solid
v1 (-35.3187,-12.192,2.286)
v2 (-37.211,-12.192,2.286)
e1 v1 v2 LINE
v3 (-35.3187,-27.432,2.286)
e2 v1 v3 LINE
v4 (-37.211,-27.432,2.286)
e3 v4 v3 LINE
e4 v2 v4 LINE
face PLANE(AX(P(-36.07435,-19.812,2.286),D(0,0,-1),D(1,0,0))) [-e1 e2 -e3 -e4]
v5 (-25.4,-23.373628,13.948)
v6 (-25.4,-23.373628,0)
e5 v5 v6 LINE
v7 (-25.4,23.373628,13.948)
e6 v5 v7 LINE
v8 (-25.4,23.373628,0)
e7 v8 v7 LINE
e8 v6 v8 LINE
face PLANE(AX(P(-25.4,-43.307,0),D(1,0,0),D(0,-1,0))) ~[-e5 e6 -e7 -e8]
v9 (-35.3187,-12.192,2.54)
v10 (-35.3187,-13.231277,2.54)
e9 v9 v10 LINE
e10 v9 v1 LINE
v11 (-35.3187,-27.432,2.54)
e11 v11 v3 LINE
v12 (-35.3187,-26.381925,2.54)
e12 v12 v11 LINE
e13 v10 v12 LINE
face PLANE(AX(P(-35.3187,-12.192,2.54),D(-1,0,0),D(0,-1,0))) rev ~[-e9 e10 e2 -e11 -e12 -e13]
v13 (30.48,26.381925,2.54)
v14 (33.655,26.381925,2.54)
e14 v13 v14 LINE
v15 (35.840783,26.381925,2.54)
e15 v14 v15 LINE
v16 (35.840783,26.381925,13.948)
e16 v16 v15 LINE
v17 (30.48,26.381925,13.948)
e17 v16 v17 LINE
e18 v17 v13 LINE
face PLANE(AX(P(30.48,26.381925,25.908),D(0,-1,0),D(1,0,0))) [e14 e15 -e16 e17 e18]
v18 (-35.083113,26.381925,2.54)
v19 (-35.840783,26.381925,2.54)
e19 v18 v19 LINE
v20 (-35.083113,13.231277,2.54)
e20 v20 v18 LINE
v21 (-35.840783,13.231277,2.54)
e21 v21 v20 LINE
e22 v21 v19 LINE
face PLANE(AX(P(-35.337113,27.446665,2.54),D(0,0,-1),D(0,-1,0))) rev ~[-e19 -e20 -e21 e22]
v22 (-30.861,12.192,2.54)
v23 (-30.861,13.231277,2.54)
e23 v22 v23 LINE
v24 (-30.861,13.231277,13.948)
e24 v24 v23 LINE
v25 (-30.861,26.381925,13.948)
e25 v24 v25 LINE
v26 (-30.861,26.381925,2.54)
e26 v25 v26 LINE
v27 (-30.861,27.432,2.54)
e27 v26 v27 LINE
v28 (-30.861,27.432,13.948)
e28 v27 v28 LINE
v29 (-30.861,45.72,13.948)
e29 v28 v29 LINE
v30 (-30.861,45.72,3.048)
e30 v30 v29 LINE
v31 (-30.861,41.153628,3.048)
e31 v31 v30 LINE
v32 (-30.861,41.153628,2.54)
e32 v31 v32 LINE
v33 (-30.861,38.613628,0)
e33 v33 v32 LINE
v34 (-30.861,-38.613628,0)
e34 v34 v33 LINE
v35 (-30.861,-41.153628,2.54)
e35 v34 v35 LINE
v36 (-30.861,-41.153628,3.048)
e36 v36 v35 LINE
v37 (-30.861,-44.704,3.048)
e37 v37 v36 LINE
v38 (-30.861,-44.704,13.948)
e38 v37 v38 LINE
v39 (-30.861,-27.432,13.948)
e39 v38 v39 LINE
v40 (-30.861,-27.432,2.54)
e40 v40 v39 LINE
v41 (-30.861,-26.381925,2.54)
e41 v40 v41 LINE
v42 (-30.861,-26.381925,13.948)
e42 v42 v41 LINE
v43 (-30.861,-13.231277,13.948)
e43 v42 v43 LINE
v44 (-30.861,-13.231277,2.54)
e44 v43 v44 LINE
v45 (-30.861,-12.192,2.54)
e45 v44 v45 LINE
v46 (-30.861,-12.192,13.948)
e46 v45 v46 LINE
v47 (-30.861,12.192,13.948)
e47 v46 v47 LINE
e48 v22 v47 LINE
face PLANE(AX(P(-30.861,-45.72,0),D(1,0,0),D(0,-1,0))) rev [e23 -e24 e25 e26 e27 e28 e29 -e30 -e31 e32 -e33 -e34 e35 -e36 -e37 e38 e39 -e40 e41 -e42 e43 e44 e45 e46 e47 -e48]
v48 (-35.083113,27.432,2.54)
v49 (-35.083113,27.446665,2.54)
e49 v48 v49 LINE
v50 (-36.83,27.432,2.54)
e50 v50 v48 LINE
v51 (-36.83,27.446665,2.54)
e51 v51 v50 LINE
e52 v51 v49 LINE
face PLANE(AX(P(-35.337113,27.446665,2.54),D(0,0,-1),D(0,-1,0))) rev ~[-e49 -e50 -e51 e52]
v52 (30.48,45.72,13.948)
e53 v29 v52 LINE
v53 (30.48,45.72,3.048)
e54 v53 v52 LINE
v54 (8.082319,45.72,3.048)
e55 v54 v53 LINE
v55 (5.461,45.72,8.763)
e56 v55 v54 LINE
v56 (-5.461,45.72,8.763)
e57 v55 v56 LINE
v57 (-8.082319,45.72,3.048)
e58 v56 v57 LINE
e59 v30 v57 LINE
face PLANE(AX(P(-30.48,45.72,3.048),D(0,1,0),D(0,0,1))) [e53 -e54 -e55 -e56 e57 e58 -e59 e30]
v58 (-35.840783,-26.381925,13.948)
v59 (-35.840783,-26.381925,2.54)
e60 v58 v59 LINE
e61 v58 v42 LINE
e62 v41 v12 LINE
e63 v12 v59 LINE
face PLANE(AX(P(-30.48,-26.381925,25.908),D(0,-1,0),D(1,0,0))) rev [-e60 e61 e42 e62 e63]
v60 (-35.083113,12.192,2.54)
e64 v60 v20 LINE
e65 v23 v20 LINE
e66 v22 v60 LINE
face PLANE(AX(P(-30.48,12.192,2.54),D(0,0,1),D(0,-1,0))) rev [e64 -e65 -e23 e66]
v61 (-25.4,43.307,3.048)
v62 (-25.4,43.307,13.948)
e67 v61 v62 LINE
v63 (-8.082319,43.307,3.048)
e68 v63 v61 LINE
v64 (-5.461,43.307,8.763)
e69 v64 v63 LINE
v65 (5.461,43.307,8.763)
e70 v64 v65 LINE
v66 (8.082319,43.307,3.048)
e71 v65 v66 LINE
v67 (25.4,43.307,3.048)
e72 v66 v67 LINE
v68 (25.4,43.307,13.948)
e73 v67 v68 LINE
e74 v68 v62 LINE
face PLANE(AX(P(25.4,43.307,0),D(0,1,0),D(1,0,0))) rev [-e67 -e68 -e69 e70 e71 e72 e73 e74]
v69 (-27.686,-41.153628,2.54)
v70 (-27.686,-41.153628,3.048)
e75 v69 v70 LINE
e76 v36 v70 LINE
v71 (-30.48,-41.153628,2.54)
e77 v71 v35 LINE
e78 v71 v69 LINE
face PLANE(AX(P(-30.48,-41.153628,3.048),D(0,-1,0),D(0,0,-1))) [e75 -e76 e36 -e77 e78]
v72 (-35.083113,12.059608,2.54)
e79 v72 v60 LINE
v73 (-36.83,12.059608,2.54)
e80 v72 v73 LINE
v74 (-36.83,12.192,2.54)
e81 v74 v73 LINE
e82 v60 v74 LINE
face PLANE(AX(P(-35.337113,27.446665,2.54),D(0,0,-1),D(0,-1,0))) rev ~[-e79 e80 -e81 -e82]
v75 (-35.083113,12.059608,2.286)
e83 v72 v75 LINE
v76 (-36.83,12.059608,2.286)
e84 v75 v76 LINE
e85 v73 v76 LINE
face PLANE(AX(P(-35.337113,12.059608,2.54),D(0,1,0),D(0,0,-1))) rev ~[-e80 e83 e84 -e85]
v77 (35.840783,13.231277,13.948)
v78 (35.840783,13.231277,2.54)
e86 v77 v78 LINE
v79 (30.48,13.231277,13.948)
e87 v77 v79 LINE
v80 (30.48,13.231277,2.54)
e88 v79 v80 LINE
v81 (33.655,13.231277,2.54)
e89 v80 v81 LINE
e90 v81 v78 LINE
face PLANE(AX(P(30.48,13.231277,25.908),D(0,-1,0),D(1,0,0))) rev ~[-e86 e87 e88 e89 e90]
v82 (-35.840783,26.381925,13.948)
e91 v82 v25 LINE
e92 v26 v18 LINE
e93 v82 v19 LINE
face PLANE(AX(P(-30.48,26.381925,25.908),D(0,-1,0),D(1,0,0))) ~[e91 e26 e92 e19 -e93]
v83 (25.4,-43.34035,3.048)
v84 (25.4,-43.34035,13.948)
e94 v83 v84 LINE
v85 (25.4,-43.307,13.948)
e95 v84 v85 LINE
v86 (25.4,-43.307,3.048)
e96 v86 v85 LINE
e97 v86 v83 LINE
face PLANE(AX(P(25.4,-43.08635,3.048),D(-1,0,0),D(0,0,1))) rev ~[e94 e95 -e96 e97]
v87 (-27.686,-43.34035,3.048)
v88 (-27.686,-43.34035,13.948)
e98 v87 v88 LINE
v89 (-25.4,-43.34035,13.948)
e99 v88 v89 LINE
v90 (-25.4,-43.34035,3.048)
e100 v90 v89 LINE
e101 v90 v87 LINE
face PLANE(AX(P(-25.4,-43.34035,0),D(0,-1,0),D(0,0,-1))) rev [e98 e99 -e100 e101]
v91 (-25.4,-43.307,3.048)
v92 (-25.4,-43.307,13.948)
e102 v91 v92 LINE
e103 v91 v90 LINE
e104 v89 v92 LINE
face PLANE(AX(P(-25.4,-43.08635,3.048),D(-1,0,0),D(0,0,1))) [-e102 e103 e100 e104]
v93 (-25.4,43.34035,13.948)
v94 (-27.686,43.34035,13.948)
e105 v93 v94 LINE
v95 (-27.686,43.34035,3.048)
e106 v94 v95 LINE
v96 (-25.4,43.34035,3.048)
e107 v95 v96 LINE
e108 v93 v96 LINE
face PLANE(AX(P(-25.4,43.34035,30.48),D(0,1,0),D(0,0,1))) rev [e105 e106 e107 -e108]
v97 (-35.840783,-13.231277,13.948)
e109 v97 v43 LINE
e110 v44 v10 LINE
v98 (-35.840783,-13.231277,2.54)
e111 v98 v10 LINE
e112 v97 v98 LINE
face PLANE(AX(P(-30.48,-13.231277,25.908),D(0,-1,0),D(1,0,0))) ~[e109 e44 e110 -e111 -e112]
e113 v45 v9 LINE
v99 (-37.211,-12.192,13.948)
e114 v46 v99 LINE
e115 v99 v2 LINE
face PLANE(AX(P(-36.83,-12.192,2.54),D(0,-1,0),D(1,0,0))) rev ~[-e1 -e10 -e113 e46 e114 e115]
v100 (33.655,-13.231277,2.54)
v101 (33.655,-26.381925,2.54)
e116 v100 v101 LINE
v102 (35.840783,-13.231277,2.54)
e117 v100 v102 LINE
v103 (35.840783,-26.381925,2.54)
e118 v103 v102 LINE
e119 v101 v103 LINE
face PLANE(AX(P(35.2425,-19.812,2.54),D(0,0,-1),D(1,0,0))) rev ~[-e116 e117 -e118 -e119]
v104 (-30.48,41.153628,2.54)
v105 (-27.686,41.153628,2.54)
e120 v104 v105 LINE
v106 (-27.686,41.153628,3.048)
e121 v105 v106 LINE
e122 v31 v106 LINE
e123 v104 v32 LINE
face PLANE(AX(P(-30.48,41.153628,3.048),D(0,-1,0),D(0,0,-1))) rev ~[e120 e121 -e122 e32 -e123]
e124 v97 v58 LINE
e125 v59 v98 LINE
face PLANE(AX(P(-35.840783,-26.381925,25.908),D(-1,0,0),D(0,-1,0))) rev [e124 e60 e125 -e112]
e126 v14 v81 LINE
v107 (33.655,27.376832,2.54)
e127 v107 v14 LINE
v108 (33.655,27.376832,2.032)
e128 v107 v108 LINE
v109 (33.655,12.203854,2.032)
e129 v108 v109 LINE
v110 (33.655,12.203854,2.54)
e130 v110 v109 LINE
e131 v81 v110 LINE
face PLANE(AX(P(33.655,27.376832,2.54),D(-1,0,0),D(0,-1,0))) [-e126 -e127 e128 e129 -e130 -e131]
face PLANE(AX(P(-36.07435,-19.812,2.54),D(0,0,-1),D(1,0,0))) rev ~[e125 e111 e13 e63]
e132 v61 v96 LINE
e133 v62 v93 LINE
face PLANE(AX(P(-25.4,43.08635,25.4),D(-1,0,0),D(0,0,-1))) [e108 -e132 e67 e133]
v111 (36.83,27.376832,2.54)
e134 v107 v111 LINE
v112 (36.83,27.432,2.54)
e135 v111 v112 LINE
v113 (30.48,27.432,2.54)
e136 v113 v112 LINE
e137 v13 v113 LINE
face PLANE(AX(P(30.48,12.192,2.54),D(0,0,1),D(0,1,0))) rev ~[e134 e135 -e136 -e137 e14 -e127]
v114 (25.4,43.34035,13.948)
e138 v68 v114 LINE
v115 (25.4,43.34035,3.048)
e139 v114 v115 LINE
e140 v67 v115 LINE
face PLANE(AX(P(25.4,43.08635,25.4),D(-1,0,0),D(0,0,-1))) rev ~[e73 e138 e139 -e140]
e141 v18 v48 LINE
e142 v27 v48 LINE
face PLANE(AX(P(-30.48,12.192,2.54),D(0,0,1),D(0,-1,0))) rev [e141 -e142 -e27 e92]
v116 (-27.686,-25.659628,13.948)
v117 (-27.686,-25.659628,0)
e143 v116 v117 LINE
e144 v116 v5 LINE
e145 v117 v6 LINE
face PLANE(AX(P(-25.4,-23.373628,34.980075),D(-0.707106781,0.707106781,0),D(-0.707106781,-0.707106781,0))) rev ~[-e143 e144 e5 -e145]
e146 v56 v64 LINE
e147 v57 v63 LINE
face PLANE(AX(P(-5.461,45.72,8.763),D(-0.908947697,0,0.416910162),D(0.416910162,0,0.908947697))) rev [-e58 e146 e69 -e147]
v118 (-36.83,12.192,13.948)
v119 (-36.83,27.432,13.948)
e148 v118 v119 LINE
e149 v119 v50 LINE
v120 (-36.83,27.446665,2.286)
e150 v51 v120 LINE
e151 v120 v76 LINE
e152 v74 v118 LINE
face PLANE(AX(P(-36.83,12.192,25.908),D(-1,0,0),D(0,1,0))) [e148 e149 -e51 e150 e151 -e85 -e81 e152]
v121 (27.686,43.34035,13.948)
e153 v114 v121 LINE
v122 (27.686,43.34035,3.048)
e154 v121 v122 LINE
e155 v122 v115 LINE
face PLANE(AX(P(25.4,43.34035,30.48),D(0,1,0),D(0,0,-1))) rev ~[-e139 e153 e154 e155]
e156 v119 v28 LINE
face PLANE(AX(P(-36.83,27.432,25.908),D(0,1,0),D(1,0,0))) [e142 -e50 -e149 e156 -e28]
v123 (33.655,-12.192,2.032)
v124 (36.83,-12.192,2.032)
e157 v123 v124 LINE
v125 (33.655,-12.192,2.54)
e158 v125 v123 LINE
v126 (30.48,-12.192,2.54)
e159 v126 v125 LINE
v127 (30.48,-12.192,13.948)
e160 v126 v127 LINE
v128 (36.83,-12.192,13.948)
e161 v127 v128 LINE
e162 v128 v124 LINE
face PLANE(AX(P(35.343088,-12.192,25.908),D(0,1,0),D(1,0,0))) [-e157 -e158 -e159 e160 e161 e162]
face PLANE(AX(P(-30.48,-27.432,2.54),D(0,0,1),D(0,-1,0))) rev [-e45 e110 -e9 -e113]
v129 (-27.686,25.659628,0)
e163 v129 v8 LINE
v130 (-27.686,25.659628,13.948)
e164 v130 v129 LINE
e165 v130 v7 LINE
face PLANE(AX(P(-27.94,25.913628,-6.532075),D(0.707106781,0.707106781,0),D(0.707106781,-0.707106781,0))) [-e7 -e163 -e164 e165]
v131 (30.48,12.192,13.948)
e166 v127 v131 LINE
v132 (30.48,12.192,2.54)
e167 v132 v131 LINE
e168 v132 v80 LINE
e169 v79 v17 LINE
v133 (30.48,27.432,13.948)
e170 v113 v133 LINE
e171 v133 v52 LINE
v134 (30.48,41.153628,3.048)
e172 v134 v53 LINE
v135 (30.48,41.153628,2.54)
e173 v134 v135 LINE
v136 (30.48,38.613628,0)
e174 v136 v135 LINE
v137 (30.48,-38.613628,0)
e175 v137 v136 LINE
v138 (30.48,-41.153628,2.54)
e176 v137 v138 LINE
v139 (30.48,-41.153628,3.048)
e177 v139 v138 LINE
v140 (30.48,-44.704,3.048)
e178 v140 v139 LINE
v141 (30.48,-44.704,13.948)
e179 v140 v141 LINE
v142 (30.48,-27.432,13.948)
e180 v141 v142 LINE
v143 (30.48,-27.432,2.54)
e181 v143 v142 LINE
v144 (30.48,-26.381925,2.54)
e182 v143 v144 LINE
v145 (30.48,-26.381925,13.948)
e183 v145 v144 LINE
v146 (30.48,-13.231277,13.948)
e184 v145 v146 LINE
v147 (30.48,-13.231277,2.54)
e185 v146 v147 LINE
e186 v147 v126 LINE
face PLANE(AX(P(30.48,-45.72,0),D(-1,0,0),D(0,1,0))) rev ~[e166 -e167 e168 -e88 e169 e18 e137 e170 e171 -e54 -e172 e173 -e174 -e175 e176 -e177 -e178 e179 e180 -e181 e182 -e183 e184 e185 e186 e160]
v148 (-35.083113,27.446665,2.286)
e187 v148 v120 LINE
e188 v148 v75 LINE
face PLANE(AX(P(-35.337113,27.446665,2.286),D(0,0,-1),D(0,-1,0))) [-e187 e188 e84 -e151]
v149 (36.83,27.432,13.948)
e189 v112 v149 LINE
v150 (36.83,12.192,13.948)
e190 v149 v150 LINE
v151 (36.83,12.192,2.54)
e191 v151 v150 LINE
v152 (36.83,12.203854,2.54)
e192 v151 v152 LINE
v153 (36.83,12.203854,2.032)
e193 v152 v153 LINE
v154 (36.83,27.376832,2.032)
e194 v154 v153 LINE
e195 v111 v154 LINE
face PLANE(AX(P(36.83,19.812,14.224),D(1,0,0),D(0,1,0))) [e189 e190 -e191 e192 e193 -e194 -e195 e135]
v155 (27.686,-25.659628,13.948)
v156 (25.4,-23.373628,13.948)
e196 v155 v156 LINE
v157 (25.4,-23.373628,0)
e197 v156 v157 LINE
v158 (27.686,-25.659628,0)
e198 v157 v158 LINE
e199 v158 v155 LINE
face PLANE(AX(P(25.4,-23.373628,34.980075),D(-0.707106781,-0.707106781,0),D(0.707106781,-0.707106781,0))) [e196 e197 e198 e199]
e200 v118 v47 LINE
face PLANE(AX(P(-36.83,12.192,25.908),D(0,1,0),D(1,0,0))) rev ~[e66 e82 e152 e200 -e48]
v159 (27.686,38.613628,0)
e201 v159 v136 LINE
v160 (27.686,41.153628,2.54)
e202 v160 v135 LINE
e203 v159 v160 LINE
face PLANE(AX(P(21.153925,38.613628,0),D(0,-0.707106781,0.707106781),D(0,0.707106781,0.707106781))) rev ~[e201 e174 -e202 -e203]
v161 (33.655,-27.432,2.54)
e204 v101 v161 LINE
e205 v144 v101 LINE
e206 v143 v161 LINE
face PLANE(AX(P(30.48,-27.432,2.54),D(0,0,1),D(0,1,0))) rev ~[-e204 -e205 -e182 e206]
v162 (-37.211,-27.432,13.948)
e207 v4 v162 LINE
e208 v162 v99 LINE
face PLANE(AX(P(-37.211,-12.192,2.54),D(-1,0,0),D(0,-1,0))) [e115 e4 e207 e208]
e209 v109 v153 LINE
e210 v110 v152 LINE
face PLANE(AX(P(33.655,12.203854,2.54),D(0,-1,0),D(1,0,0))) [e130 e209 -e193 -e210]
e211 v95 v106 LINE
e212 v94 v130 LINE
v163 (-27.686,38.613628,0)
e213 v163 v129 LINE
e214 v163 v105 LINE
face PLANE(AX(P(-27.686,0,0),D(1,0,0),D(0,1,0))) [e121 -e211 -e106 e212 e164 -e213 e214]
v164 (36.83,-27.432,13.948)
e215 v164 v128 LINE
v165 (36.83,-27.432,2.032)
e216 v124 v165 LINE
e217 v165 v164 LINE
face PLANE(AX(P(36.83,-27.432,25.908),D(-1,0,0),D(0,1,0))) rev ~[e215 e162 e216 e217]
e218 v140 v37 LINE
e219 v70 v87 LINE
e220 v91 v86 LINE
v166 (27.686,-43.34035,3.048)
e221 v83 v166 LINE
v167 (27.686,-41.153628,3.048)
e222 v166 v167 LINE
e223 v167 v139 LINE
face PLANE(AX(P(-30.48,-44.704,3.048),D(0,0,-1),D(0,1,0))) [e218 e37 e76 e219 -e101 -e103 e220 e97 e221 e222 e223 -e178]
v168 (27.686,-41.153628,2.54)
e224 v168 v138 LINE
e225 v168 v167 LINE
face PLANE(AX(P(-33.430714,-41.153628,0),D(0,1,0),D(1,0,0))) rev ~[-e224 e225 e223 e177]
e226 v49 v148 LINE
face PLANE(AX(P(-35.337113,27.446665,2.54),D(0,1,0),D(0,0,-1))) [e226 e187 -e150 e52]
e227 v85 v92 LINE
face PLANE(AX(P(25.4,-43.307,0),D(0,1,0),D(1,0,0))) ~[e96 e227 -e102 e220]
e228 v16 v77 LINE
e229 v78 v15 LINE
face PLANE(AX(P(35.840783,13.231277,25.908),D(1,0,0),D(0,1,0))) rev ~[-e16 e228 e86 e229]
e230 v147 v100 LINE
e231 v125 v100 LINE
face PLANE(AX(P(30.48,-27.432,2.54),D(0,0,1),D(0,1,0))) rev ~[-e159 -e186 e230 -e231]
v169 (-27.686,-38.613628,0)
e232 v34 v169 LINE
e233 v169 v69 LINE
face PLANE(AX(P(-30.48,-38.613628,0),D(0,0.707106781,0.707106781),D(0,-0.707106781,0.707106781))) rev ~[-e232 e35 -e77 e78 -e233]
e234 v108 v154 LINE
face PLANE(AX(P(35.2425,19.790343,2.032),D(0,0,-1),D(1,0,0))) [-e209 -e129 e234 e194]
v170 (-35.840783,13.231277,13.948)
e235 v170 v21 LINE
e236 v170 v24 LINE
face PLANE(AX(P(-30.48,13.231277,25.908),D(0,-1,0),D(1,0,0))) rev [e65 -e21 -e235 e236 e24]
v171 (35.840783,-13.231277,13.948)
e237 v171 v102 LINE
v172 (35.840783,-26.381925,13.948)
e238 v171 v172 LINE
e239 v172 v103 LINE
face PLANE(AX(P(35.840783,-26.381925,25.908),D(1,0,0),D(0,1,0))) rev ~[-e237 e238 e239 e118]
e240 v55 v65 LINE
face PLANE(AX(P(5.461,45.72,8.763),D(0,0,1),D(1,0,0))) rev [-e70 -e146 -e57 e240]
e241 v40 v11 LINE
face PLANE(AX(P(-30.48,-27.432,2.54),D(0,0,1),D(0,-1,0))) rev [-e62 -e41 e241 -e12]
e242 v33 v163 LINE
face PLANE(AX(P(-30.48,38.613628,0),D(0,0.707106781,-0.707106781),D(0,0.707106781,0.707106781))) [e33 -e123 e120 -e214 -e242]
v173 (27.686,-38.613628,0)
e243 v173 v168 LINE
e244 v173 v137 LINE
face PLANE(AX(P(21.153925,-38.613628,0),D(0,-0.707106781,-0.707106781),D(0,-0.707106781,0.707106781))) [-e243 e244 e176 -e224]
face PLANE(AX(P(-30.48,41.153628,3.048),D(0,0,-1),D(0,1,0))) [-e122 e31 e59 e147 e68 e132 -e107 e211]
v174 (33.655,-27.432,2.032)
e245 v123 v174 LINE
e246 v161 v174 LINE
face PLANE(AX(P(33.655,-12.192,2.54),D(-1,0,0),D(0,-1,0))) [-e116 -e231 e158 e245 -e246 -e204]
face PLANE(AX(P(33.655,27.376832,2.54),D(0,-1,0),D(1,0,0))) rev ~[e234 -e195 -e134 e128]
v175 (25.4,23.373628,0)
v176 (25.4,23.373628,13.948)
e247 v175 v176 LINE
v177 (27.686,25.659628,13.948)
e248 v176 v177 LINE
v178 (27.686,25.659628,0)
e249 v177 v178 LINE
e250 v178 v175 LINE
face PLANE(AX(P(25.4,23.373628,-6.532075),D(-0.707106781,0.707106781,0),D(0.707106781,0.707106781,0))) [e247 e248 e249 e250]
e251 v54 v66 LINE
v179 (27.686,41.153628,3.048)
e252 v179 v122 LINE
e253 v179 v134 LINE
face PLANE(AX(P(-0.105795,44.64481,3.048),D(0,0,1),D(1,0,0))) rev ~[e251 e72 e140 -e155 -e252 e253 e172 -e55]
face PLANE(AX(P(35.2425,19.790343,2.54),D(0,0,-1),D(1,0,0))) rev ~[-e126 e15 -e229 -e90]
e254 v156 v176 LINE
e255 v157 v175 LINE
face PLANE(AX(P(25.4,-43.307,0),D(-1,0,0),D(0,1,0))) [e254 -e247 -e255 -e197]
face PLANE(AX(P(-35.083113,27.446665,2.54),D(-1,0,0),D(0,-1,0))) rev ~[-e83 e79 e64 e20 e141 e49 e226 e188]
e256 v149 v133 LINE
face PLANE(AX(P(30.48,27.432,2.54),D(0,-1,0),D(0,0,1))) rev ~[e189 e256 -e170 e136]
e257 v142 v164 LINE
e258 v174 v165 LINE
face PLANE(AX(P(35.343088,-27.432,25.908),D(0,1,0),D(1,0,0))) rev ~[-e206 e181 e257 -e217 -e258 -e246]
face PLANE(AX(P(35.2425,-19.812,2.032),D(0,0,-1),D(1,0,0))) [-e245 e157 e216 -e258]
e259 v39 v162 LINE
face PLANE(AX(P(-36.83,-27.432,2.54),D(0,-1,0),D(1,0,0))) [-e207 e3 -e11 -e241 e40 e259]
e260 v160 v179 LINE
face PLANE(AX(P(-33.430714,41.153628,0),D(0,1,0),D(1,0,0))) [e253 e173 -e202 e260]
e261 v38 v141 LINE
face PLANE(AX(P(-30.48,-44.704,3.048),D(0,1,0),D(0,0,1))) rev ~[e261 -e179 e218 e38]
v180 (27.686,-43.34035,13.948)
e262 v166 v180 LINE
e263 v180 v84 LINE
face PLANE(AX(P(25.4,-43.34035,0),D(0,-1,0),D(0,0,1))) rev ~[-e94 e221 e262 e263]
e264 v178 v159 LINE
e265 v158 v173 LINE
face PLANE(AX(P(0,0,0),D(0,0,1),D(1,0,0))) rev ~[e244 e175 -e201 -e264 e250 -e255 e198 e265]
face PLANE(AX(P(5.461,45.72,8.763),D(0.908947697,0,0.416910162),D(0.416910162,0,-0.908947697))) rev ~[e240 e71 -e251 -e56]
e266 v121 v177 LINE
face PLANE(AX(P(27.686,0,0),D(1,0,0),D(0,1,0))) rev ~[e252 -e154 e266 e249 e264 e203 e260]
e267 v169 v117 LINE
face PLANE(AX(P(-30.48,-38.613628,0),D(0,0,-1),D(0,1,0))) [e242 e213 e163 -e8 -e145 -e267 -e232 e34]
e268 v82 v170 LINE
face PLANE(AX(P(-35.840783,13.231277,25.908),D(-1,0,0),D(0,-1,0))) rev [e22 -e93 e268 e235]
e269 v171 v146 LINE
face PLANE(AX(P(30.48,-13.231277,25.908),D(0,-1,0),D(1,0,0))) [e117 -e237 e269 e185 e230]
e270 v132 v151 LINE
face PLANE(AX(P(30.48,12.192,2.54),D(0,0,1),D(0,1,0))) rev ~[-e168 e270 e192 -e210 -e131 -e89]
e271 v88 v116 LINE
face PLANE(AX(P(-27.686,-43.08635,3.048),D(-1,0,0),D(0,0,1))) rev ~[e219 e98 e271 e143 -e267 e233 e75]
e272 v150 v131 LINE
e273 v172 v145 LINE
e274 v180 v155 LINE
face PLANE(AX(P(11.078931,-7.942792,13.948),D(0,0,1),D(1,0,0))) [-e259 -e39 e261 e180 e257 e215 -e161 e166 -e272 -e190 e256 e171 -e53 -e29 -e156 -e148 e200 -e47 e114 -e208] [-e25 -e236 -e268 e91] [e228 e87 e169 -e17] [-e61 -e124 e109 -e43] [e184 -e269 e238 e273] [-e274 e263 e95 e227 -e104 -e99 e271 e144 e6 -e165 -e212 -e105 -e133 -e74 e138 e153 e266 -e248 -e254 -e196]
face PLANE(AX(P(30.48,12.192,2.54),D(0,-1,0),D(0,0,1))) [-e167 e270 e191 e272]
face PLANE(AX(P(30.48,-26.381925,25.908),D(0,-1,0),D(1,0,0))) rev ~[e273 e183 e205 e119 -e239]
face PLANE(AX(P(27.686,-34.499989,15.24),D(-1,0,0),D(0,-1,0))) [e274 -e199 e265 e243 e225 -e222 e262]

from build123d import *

# Parameters (mm, degrees)
F0_W          = 60.96
F0_H          = 91.44
F0_W_2        = 50.8
F0_H_2        = 86.614
F1_DEPTH      = 28.448
F3_DEPTH      = 25.4
F4_W          = 66.649839282
F4_H          = 6.9823637605
F5_DEPTH      = 3.048
F6_W          = 64.9686481762
F6_H          = 4.777956934
F7_DEPTH      = 3.048
F9_DEPTH      = 2.286
F10_W         = 99.848318845
F10_H         = 48.2080141082
F11_DEPTH     = 50.8
F13_T1_DEPTH  = 15.8581495789
F13_T3_DEPTH  = 15.8581495789
F13_T8_DEPTH  = 41.5121495789
F13_T13_DEPTH = 41.5121495789
F13_T18_DEPTH = 41.5121495789
F13_T23_DEPTH = 41.5121495789
F14_W         = 15.24
F14_H         = 23.368
F15_DEPTH     = 6.35
F16_W         = 5.3607832682
F16_H         = 13.1506472826
F17_DEPTH     = 25.909
F19_DEPTH     = 0.254
F20_DEPTH     = 0.254
F21_DEPTH     = 1.016
F22_W         = 3.175
F22_H         = 15.24
F22_H_2       = 15.425526537
F23_DEPTH     = 0.508
F24_W         = 3.175
F24_H         = 15.24
F24_H_2       = 15.1729788631
F25_DEPTH     = 0.508
F26_W         = 1.4869117904
F26_H         = 15.24
F26_H_2       = 15.1544166729
F27_DEPTH     = 0.508
F28_W         = 1.5113
F28_H         = 15.24
F28_W_2       = 1.492887156
F28_H_2       = 15.3870563954
F29_DEPTH     = 0.254
F30_DEPTH     = 0.381
F31_DEPTH     = 0.254
F32_W         = 105.9566885233
F32_H         = 116.2753328681
F33_DEPTH     = 14.5


# Not quite as in the source:
# - a fillet or chamfer that OpenCascade refuses, or shapes differently, is made with other operations: its cross-section is extruded or revolved along the edge and cut away or added
# - a feature names something its author has since deleted; it is built from what else it names


with BuildPart() as f1:
    # F0 (on Top) → F1 (new body)
    with BuildSketch(Plane.XY):
        Rectangle(F0_W, F0_H)
        Rectangle(F0_W_2, F0_H_2, mode=Mode.SUBTRACT)
    extrude(amount=F1_DEPTH)

    # F2 (on face) → F3 (cut)
    with BuildSketch(Plane(origin=(0, 45.72, 0), x_dir=(-1, 0, 0), z_dir=(0, 1, 0))):
        Polygon((-9.4803553075, 0), (0, 0), (9.4803553075, 0), (5.461, 8.763), (-5.461, 8.763), align=None)
        Polygon((-9.4803553075, 28.448), (-5.461, 19.685), (5.461, 19.685), (9.4803553075, 28.448), (0, 28.448), align=None)
    extrude(amount=-F3_DEPTH, mode=Mode.SUBTRACT)

    # F4 (on Top) → F5 (cut)
    with BuildSketch(Plane.XY):
        with Locations((-0.1057945192, 44.6448102593)):
            Rectangle(F4_W, F4_H)
        with Locations((-0.1057945192, -44.6448102593)):
            Rectangle(F4_W, F4_H)
    extrude(amount=F5_DEPTH, mode=Mode.SUBTRACT)

    # F6 (on face) → F7 (cut)
    with BuildSketch(Plane.XY.offset(28.448)):
        with Locations((-2.0043240881, 43.331021533)):
            Rectangle(F6_W, F6_H)
        with Locations((-2.0043240881, -43.331021533)):
            Rectangle(F6_W, F6_H)
    extrude(amount=-F7_DEPTH, mode=Mode.SUBTRACT)

    # F8 (on face) → F9 (cut)
    with BuildSketch(Plane(origin=(25.4, 0, 0), x_dir=(0, -1, 0), z_dir=(-1, 0, 0))):
        Polygon((-43.0863499641, 0), (-41.1536283791, 0), (-25.9136283791, 0), (-25.9136283791, 30.48), (-41.1536283791, 30.48), (-43.0863499641, 30.48), align=None)
        Polygon((25.9136283791, 30.48), (25.9136283791, 0), (41.1536283791, 0), (43.0863499641, 0), (43.0863499641, 30.48), (41.1536283791, 30.48), align=None)
    extrude(amount=-F9_DEPTH, mode=Mode.SUBTRACT)

    # F10 (on Right) → F11 (cut)
    with BuildSketch(Plane.YZ):
        with Locations((1.7518345267, 13.4315635078)):
            Rectangle(F10_W, F10_H)
    extrude(amount=-F11_DEPTH, mode=Mode.SUBTRACT)

    # F12: F1 across plane


with BuildPart() as f1_1:
    add(f1.part)
    add(f1.part.mirror(Plane.YZ))

    # F13: chamfer of 2.54 on 12 edges, made by hand

    # F13_s2 → F13_t1 (cut)
    with BuildSketch(Plane.YZ.offset(-37.0120747894)):
        Polygon((38.402043066, 28.448), (40.942043066, 25.908), (40.942043066, 28.448), align=None)
        Polygon((38.6136283791, 0), (41.1536283791, 2.54), (41.1536283791, 0), align=None)
        Polygon((-40.942043066, 25.908), (-38.402043066, 28.448), (-40.942043066, 28.448), align=None)
        Polygon((-38.6136283791, 0), (-41.1536283791, 2.54), (-41.1536283791, 0), align=None)
    extrude(amount=F13_T1_DEPTH, mode=Mode.SUBTRACT)

    # F13_s4 → F13_t3 (cut)
    with BuildSketch(Plane.YZ.offset(21.1539252106)):
        Polygon((38.402043066, 28.448), (40.942043066, 25.908), (40.942043066, 28.448), align=None)
        Polygon((-40.942043066, 25.908), (-38.402043066, 28.448), (-40.942043066, 28.448), align=None)
        Polygon((-38.6136283791, 0), (-41.1536283791, 2.54), (-41.1536283791, 0), align=None)
        Polygon((38.6136283791, 0), (41.1536283791, 2.54), (41.1536283791, 0), align=None)
    extrude(amount=F13_T3_DEPTH, mode=Mode.SUBTRACT)


with BuildPart() as f13_tool6:
    # F13_s7 → F13_t8 (new body)
    with BuildSketch(Plane.XY.offset(-6.5320747894)):
        Polygon((25.4, 23.3736283791), (27.94, 25.9136283791), (25.4, 25.9136283791), align=None)
    extrude(amount=F13_T8_DEPTH)

    split(bisect_by=Plane.YZ.offset(27.686), keep=Keep.BOTTOM)


with BuildPart() as f1_2:
    add(f1_1.part)

    # F13_t5: cut F13_tool6
    add(f13_tool6.part, mode=Mode.SUBTRACT)


with BuildPart() as f13_tool11:
    # F13_s12 → F13_t13 (new body)
    with BuildSketch(Plane.XY.offset(34.9800747894)):
        Polygon((25.4, -23.3736283791), (27.94, -25.9136283791), (25.4, -25.9136283791), align=None)
    extrude(amount=-F13_T13_DEPTH)

    split(bisect_by=Plane.YZ.offset(27.686), keep=Keep.BOTTOM)


with BuildPart() as f1_3:
    add(f1_2.part)

    # F13_t10: cut F13_tool11
    add(f13_tool11.part, mode=Mode.SUBTRACT)


with BuildPart() as f13_tool16:
    # F13_s17 → F13_t18 (new body)
    with BuildSketch(Plane.XY.offset(-6.5320747894)):
        Polygon((-27.94, 25.9136283791), (-25.4, 23.3736283791), (-25.4, 25.9136283791), align=None)
    extrude(amount=F13_T18_DEPTH)

    split(bisect_by=Plane.YZ.offset(-27.686), keep=Keep.TOP)


with BuildPart() as f1_4:
    add(f1_3.part)

    # F13_t15: cut F13_tool16
    add(f13_tool16.part, mode=Mode.SUBTRACT)


with BuildPart() as f13_tool21:
    # F13_s22 → F13_t23 (new body)
    with BuildSketch(Plane.XY.offset(34.9800747894)):
        Polygon((-25.4, -23.3736283791), (-27.94, -25.9136283791), (-25.4, -25.9136283791), align=None)
    extrude(amount=-F13_T23_DEPTH)

    split(bisect_by=Plane.YZ.offset(-27.686), keep=Keep.TOP)


with BuildPart() as f1_5:
    add(f1_4.part)

    # F13_t20: cut F13_tool21
    add(f13_tool21.part, mode=Mode.SUBTRACT)

    # F14 (on face) → F15 (join)
    with BuildSketch(Plane.YZ.offset(30.48)):
        with Locations((-19.812, 14.224)):
            Rectangle(F14_W, F14_H)
        with Locations((19.812, 14.224)):
            Rectangle(F14_W, F14_H)
    extrude(amount=F15_DEPTH)

    # F16 (on face) → F17 (cut, through all)
    with BuildSketch(Plane.XY.offset(25.908)):
        with Locations((33.1603916341, -19.8066011071)):
            Rectangle(F16_W, F16_H)
        with Locations((33.1603916341, 19.8066011071)):
            Rectangle(F16_W, F16_H)
    extrude(amount=-F17_DEPTH, mode=Mode.SUBTRACT)

    # F18: F1 across plane


with BuildPart() as f1_6:
    add(f1_5.part)
    add(f1_5.part.mirror(Plane.YZ))

    # F19 (cut): faces of the model
    f19_faces = [f1_6.faces().sort_by_distance(p)[0] for p in [
        (26.543, -43.0863499641, 14.224),
        (-26.543, -43.0863499641, 14.224),
    ]]
    extrude(f19_faces, amount=-F19_DEPTH, mode=Mode.SUBTRACT)

    # F20 (cut): faces of the model
    f20_faces = [f1_6.faces().sort_by_distance(p)[0] for p in [
        (26.543, 43.0863499641, 14.224),
        (-26.543, 43.0863499641, 14.224),
    ]]
    extrude(f20_faces, amount=-F20_DEPTH, mode=Mode.SUBTRACT)

    # F21 (cut): a face of the model
    f21_faces = [f1_6.faces().sort_by_distance(p)[0] for p in [
        (0, -45.72, 14.224),
    ]]
    extrude(f21_faces, amount=-F21_DEPTH, mode=Mode.SUBTRACT)

    # F22 (on face) → F23 (join)
    with BuildSketch(Plane.XY.offset(25.908)):
        with Locations((-35.2425, 19.812)):
            Rectangle(F22_W, F22_H)
        with Locations((-35.2425, -19.7230628692)):
            Rectangle(F22_W, F22_H_2)
    extrude(amount=F23_DEPTH)

    # F24 (on face) → F25 (join)
    with BuildSketch(Plane(origin=(0, 0, 2.54), x_dir=(1, 0, 0), z_dir=(0, 0, -1))):
        with Locations((35.2425, 19.812)):
            Rectangle(F24_W, F24_H)
        with Locations((35.2425, -19.7903430089)):
            Rectangle(F24_W, F24_H_2)
    extrude(amount=F25_DEPTH)

    # F26 (on face) → F27 (join)
    with BuildSketch(Plane.XY.offset(25.908)):
        with Locations((36.0865441048, -19.812)):
            Rectangle(F26_W, F26_H)
        with Locations((36.0865441048, 19.7994005866)):
            Rectangle(F26_W, F26_H_2)
    extrude(amount=F27_DEPTH)

    # F28 (on face) → F29 (join)
    with BuildSketch(Plane(origin=(0, 0, 2.54), x_dir=(1, 0, 0), z_dir=(0, 0, -1))):
        with Locations((-36.07435, 19.812)):
            Rectangle(F28_W, F28_H)
        with Locations((-36.083556422, -19.7531366721)):
            Rectangle(F28_W_2, F28_H_2)
    extrude(amount=F29_DEPTH)

    # F30 (add): faces of the model
    f30_faces = [f1_6.faces().sort_by_distance(p)[0] for p in [
        (-30.48, 0.4258489378, 14.2172059936),
        (-35.3187, -19.812, 2.413),
        (-35.8407832682, -19.8066011071, 14.224),
        (-36.83, -19.8101053315, 14.3540262363),
    ]]
    extrude(f30_faces, amount=F30_DEPTH, dir=(-1, 0, 0))

    # F31 (add): a face of the model
    f31_faces = [f1_6.faces().sort_by_distance(p)[0] for p in [
        (-35.337112844, 19.7531366721, 2.413),
    ]]
    extrude(f31_faces, amount=F31_DEPTH)

    # F32 (on face) → F33 (cut)
    with BuildSketch(Plane.XY.offset(28.448)):
        with Locations((11.0789313912, -7.9427920282)):
            Rectangle(F32_W, F32_H)
    extrude(amount=-F33_DEPTH, mode=Mode.SUBTRACT)


solid = f1_6.part
